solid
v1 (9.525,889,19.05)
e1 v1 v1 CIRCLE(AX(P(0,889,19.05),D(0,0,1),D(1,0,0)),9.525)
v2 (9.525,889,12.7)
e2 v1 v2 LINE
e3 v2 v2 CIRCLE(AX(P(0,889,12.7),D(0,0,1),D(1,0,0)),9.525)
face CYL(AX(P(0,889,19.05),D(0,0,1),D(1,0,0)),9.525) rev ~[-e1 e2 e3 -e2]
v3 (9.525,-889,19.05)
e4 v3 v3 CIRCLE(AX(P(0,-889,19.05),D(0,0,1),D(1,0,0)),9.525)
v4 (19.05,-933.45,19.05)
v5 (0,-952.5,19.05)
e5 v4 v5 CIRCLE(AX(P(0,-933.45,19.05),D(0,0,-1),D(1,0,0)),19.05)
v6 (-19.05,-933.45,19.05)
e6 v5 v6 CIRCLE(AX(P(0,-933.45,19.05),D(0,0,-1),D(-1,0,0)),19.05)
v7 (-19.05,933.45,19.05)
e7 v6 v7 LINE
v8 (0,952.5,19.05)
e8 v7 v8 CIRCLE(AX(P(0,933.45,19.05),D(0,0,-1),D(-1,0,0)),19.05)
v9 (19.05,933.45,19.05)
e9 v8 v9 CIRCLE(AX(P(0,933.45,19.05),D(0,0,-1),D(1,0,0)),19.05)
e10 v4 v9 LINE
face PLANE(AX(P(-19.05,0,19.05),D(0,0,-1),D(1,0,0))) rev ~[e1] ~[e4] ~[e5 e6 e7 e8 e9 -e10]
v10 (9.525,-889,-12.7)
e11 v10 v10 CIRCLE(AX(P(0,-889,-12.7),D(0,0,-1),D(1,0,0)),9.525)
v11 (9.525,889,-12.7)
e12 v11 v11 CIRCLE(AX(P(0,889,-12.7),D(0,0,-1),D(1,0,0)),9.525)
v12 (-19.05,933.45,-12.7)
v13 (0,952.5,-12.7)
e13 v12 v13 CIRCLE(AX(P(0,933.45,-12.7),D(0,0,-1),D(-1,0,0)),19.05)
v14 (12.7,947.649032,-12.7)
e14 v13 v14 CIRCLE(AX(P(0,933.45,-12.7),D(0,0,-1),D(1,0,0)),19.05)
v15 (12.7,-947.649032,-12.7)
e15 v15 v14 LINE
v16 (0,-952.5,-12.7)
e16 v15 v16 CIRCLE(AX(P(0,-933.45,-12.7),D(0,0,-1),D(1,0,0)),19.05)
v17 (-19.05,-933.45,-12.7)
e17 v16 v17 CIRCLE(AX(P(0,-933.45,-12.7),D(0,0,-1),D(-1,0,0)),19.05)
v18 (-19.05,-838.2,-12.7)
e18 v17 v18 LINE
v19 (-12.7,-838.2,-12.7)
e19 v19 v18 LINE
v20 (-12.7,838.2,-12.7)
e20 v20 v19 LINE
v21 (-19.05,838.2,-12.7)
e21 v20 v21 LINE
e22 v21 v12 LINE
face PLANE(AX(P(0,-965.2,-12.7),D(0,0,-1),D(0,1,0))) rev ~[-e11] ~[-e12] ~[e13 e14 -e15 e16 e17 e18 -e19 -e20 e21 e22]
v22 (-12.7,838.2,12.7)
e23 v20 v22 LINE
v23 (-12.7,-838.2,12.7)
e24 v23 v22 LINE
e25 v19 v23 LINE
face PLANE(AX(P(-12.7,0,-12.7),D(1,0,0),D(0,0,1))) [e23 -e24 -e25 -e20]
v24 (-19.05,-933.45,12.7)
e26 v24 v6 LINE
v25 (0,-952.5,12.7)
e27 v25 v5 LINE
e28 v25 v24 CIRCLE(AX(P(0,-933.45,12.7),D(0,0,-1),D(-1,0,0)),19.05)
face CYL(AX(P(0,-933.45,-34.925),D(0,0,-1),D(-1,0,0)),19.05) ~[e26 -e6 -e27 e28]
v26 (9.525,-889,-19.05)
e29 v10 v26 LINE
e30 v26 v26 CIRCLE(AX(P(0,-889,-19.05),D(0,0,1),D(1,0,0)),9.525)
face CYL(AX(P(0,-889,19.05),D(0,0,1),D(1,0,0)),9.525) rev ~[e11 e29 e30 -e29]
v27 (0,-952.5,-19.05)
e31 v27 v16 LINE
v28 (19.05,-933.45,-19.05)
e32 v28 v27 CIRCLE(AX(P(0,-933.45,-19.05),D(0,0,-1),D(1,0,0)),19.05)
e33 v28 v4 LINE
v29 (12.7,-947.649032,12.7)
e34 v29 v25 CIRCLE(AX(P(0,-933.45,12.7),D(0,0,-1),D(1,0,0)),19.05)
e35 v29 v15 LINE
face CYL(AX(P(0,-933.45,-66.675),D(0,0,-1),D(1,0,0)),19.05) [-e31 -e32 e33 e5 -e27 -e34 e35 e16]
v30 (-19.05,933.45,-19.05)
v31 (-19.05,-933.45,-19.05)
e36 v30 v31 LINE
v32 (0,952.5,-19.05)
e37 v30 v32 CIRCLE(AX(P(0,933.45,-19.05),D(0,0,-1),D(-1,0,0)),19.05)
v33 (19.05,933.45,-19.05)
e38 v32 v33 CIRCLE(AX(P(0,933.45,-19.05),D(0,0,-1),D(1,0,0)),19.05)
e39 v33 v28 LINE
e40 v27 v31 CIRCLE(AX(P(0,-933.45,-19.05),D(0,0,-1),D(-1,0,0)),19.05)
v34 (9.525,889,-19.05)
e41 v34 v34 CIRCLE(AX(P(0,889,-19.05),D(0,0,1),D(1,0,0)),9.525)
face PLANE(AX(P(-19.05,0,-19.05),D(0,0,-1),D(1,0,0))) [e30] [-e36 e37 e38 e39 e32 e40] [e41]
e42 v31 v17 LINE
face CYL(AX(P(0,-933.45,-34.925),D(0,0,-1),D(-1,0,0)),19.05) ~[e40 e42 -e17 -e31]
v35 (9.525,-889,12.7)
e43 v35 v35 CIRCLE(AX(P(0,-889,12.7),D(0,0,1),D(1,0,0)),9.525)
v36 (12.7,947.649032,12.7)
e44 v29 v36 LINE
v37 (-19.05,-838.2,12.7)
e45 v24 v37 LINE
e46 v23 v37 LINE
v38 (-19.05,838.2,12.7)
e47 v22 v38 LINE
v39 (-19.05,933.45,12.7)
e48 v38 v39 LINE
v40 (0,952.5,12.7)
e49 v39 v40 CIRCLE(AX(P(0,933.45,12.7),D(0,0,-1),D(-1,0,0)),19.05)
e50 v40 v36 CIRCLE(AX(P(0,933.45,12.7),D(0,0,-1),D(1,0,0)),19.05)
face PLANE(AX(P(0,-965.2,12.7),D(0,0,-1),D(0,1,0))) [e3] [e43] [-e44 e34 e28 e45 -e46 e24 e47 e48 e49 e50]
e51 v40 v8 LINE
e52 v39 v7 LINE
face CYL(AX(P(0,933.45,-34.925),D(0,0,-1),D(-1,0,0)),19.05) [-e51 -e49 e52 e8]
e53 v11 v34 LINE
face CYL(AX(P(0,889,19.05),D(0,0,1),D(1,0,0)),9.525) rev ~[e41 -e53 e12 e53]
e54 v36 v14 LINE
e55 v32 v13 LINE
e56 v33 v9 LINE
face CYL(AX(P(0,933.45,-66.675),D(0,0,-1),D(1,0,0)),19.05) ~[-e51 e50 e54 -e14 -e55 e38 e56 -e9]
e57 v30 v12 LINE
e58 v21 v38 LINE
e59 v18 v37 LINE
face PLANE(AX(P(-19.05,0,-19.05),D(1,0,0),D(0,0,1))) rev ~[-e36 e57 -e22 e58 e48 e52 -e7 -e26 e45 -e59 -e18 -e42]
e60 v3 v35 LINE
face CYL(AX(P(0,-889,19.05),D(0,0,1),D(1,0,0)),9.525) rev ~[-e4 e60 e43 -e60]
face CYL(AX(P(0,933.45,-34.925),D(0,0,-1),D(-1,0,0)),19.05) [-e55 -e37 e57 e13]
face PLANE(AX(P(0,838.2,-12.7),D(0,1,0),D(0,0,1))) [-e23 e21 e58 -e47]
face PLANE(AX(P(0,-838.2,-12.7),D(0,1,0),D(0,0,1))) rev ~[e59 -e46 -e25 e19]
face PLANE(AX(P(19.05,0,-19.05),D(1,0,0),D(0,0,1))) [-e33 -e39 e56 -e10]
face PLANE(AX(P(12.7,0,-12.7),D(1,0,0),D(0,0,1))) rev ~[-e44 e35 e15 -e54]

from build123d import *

# Parameters (mm, degrees)
F0_W        = 38.1
F0_H        = 38.1
F0_W_2      = 25.4
F0_H_2      = 25.4
F1_DEPTH    = 952.5
F2_R        = 9.525
F3_DEPTH    = 76.2
F4_W        = 127
F4_H        = 25.4
F5_DEPTH    = 25.4
F6_T1_DEPTH = 133.35
F6_T3_DEPTH = 101.6
F6_T5_DEPTH = 101.6


# Not quite as in the source:
# - a fillet or chamfer that OpenCascade refuses, or shapes differently, is made with other operations: its cross-section is extruded or revolved along the edge and cut away or added


with BuildPart() as f1:
    # F0 (on Front) → F1 (new body, symmetric)
    with BuildSketch(Plane.XZ):
        Rectangle(F0_W, F0_H)
        Rectangle(F0_W_2, F0_H_2, mode=Mode.SUBTRACT)
    extrude(amount=F1_DEPTH, both=True)

    # F2 (on face) → F3 (cut)
    with BuildSketch(Plane.XY.offset(19.05)):
        with Locations((0, -889)):
            Circle(F2_R)
        with Locations((0, 889)):
            Circle(F2_R)
    extrude(amount=-F3_DEPTH, mode=Mode.SUBTRACT)

    # F4 (on Right) → F5 (cut)
    with BuildSketch(Plane.YZ):
        with Locations((901.7, 0)):
            Rectangle(F4_W, F4_H)
        with Locations((-901.7, 0)):
            Rectangle(F4_W, F4_H)
    extrude(amount=-F5_DEPTH, mode=Mode.SUBTRACT)

    # F6: fillet of radius 19.05 on 6 edges, made by hand

    # F6_s2 → F6_t1 (cut)
    with BuildSketch(Plane.XY.offset(-66.675)):
        with BuildLine():
            ThreePointArc((19.05, -933.45), (13.4703841816, -946.9203841816), (0, -952.5))
            Line((0, -952.5), (19.05, -952.5))
            Line((19.05, -952.5), (19.05, -933.45))
        make_face()
        with BuildLine():
            ThreePointArc((19.05, 933.45), (13.4703841816, 946.9203841816), (0, 952.5))
            Line((0, 952.5), (19.05, 952.5))
            Line((19.05, 952.5), (19.05, 933.45))
        make_face()
    extrude(amount=F6_T1_DEPTH, mode=Mode.SUBTRACT)

    # F6_s4 → F6_t3 (cut)
    with BuildSketch(Plane.XY.offset(-34.925)):
        with BuildLine():
            ThreePointArc((-19.05, -933.45), (-13.4703841816, -946.9203841816), (0, -952.5))
            Line((0, -952.5), (-19.05, -952.5))
            Line((-19.05, -952.5), (-19.05, -933.45))
        make_face()
        with BuildLine():
            ThreePointArc((-19.05, 933.45), (-13.4703841816, 946.9203841816), (0, 952.5))
            Line((0, 952.5), (-19.05, 952.5))
            Line((-19.05, 952.5), (-19.05, 933.45))
        make_face()
    extrude(amount=F6_T3_DEPTH, mode=Mode.SUBTRACT)

    # F6_s6 → F6_t5 (cut)
    with BuildSketch(Plane.XY.offset(-66.675)):
        with BuildLine():
            ThreePointArc((-19.05, -933.45), (-13.4703841816, -946.9203841816), (0, -952.5))
            Line((0, -952.5), (-19.05, -952.5))
            Line((-19.05, -952.5), (-19.05, -933.45))
        make_face()
        with BuildLine():
            ThreePointArc((-19.05, 933.45), (-13.4703841816, 946.9203841816), (0, 952.5))
            Line((0, 952.5), (-19.05, 952.5))
            Line((-19.05, 952.5), (-19.05, 933.45))
        make_face()
    extrude(amount=F6_T5_DEPTH, mode=Mode.SUBTRACT)


solid = f1.part
